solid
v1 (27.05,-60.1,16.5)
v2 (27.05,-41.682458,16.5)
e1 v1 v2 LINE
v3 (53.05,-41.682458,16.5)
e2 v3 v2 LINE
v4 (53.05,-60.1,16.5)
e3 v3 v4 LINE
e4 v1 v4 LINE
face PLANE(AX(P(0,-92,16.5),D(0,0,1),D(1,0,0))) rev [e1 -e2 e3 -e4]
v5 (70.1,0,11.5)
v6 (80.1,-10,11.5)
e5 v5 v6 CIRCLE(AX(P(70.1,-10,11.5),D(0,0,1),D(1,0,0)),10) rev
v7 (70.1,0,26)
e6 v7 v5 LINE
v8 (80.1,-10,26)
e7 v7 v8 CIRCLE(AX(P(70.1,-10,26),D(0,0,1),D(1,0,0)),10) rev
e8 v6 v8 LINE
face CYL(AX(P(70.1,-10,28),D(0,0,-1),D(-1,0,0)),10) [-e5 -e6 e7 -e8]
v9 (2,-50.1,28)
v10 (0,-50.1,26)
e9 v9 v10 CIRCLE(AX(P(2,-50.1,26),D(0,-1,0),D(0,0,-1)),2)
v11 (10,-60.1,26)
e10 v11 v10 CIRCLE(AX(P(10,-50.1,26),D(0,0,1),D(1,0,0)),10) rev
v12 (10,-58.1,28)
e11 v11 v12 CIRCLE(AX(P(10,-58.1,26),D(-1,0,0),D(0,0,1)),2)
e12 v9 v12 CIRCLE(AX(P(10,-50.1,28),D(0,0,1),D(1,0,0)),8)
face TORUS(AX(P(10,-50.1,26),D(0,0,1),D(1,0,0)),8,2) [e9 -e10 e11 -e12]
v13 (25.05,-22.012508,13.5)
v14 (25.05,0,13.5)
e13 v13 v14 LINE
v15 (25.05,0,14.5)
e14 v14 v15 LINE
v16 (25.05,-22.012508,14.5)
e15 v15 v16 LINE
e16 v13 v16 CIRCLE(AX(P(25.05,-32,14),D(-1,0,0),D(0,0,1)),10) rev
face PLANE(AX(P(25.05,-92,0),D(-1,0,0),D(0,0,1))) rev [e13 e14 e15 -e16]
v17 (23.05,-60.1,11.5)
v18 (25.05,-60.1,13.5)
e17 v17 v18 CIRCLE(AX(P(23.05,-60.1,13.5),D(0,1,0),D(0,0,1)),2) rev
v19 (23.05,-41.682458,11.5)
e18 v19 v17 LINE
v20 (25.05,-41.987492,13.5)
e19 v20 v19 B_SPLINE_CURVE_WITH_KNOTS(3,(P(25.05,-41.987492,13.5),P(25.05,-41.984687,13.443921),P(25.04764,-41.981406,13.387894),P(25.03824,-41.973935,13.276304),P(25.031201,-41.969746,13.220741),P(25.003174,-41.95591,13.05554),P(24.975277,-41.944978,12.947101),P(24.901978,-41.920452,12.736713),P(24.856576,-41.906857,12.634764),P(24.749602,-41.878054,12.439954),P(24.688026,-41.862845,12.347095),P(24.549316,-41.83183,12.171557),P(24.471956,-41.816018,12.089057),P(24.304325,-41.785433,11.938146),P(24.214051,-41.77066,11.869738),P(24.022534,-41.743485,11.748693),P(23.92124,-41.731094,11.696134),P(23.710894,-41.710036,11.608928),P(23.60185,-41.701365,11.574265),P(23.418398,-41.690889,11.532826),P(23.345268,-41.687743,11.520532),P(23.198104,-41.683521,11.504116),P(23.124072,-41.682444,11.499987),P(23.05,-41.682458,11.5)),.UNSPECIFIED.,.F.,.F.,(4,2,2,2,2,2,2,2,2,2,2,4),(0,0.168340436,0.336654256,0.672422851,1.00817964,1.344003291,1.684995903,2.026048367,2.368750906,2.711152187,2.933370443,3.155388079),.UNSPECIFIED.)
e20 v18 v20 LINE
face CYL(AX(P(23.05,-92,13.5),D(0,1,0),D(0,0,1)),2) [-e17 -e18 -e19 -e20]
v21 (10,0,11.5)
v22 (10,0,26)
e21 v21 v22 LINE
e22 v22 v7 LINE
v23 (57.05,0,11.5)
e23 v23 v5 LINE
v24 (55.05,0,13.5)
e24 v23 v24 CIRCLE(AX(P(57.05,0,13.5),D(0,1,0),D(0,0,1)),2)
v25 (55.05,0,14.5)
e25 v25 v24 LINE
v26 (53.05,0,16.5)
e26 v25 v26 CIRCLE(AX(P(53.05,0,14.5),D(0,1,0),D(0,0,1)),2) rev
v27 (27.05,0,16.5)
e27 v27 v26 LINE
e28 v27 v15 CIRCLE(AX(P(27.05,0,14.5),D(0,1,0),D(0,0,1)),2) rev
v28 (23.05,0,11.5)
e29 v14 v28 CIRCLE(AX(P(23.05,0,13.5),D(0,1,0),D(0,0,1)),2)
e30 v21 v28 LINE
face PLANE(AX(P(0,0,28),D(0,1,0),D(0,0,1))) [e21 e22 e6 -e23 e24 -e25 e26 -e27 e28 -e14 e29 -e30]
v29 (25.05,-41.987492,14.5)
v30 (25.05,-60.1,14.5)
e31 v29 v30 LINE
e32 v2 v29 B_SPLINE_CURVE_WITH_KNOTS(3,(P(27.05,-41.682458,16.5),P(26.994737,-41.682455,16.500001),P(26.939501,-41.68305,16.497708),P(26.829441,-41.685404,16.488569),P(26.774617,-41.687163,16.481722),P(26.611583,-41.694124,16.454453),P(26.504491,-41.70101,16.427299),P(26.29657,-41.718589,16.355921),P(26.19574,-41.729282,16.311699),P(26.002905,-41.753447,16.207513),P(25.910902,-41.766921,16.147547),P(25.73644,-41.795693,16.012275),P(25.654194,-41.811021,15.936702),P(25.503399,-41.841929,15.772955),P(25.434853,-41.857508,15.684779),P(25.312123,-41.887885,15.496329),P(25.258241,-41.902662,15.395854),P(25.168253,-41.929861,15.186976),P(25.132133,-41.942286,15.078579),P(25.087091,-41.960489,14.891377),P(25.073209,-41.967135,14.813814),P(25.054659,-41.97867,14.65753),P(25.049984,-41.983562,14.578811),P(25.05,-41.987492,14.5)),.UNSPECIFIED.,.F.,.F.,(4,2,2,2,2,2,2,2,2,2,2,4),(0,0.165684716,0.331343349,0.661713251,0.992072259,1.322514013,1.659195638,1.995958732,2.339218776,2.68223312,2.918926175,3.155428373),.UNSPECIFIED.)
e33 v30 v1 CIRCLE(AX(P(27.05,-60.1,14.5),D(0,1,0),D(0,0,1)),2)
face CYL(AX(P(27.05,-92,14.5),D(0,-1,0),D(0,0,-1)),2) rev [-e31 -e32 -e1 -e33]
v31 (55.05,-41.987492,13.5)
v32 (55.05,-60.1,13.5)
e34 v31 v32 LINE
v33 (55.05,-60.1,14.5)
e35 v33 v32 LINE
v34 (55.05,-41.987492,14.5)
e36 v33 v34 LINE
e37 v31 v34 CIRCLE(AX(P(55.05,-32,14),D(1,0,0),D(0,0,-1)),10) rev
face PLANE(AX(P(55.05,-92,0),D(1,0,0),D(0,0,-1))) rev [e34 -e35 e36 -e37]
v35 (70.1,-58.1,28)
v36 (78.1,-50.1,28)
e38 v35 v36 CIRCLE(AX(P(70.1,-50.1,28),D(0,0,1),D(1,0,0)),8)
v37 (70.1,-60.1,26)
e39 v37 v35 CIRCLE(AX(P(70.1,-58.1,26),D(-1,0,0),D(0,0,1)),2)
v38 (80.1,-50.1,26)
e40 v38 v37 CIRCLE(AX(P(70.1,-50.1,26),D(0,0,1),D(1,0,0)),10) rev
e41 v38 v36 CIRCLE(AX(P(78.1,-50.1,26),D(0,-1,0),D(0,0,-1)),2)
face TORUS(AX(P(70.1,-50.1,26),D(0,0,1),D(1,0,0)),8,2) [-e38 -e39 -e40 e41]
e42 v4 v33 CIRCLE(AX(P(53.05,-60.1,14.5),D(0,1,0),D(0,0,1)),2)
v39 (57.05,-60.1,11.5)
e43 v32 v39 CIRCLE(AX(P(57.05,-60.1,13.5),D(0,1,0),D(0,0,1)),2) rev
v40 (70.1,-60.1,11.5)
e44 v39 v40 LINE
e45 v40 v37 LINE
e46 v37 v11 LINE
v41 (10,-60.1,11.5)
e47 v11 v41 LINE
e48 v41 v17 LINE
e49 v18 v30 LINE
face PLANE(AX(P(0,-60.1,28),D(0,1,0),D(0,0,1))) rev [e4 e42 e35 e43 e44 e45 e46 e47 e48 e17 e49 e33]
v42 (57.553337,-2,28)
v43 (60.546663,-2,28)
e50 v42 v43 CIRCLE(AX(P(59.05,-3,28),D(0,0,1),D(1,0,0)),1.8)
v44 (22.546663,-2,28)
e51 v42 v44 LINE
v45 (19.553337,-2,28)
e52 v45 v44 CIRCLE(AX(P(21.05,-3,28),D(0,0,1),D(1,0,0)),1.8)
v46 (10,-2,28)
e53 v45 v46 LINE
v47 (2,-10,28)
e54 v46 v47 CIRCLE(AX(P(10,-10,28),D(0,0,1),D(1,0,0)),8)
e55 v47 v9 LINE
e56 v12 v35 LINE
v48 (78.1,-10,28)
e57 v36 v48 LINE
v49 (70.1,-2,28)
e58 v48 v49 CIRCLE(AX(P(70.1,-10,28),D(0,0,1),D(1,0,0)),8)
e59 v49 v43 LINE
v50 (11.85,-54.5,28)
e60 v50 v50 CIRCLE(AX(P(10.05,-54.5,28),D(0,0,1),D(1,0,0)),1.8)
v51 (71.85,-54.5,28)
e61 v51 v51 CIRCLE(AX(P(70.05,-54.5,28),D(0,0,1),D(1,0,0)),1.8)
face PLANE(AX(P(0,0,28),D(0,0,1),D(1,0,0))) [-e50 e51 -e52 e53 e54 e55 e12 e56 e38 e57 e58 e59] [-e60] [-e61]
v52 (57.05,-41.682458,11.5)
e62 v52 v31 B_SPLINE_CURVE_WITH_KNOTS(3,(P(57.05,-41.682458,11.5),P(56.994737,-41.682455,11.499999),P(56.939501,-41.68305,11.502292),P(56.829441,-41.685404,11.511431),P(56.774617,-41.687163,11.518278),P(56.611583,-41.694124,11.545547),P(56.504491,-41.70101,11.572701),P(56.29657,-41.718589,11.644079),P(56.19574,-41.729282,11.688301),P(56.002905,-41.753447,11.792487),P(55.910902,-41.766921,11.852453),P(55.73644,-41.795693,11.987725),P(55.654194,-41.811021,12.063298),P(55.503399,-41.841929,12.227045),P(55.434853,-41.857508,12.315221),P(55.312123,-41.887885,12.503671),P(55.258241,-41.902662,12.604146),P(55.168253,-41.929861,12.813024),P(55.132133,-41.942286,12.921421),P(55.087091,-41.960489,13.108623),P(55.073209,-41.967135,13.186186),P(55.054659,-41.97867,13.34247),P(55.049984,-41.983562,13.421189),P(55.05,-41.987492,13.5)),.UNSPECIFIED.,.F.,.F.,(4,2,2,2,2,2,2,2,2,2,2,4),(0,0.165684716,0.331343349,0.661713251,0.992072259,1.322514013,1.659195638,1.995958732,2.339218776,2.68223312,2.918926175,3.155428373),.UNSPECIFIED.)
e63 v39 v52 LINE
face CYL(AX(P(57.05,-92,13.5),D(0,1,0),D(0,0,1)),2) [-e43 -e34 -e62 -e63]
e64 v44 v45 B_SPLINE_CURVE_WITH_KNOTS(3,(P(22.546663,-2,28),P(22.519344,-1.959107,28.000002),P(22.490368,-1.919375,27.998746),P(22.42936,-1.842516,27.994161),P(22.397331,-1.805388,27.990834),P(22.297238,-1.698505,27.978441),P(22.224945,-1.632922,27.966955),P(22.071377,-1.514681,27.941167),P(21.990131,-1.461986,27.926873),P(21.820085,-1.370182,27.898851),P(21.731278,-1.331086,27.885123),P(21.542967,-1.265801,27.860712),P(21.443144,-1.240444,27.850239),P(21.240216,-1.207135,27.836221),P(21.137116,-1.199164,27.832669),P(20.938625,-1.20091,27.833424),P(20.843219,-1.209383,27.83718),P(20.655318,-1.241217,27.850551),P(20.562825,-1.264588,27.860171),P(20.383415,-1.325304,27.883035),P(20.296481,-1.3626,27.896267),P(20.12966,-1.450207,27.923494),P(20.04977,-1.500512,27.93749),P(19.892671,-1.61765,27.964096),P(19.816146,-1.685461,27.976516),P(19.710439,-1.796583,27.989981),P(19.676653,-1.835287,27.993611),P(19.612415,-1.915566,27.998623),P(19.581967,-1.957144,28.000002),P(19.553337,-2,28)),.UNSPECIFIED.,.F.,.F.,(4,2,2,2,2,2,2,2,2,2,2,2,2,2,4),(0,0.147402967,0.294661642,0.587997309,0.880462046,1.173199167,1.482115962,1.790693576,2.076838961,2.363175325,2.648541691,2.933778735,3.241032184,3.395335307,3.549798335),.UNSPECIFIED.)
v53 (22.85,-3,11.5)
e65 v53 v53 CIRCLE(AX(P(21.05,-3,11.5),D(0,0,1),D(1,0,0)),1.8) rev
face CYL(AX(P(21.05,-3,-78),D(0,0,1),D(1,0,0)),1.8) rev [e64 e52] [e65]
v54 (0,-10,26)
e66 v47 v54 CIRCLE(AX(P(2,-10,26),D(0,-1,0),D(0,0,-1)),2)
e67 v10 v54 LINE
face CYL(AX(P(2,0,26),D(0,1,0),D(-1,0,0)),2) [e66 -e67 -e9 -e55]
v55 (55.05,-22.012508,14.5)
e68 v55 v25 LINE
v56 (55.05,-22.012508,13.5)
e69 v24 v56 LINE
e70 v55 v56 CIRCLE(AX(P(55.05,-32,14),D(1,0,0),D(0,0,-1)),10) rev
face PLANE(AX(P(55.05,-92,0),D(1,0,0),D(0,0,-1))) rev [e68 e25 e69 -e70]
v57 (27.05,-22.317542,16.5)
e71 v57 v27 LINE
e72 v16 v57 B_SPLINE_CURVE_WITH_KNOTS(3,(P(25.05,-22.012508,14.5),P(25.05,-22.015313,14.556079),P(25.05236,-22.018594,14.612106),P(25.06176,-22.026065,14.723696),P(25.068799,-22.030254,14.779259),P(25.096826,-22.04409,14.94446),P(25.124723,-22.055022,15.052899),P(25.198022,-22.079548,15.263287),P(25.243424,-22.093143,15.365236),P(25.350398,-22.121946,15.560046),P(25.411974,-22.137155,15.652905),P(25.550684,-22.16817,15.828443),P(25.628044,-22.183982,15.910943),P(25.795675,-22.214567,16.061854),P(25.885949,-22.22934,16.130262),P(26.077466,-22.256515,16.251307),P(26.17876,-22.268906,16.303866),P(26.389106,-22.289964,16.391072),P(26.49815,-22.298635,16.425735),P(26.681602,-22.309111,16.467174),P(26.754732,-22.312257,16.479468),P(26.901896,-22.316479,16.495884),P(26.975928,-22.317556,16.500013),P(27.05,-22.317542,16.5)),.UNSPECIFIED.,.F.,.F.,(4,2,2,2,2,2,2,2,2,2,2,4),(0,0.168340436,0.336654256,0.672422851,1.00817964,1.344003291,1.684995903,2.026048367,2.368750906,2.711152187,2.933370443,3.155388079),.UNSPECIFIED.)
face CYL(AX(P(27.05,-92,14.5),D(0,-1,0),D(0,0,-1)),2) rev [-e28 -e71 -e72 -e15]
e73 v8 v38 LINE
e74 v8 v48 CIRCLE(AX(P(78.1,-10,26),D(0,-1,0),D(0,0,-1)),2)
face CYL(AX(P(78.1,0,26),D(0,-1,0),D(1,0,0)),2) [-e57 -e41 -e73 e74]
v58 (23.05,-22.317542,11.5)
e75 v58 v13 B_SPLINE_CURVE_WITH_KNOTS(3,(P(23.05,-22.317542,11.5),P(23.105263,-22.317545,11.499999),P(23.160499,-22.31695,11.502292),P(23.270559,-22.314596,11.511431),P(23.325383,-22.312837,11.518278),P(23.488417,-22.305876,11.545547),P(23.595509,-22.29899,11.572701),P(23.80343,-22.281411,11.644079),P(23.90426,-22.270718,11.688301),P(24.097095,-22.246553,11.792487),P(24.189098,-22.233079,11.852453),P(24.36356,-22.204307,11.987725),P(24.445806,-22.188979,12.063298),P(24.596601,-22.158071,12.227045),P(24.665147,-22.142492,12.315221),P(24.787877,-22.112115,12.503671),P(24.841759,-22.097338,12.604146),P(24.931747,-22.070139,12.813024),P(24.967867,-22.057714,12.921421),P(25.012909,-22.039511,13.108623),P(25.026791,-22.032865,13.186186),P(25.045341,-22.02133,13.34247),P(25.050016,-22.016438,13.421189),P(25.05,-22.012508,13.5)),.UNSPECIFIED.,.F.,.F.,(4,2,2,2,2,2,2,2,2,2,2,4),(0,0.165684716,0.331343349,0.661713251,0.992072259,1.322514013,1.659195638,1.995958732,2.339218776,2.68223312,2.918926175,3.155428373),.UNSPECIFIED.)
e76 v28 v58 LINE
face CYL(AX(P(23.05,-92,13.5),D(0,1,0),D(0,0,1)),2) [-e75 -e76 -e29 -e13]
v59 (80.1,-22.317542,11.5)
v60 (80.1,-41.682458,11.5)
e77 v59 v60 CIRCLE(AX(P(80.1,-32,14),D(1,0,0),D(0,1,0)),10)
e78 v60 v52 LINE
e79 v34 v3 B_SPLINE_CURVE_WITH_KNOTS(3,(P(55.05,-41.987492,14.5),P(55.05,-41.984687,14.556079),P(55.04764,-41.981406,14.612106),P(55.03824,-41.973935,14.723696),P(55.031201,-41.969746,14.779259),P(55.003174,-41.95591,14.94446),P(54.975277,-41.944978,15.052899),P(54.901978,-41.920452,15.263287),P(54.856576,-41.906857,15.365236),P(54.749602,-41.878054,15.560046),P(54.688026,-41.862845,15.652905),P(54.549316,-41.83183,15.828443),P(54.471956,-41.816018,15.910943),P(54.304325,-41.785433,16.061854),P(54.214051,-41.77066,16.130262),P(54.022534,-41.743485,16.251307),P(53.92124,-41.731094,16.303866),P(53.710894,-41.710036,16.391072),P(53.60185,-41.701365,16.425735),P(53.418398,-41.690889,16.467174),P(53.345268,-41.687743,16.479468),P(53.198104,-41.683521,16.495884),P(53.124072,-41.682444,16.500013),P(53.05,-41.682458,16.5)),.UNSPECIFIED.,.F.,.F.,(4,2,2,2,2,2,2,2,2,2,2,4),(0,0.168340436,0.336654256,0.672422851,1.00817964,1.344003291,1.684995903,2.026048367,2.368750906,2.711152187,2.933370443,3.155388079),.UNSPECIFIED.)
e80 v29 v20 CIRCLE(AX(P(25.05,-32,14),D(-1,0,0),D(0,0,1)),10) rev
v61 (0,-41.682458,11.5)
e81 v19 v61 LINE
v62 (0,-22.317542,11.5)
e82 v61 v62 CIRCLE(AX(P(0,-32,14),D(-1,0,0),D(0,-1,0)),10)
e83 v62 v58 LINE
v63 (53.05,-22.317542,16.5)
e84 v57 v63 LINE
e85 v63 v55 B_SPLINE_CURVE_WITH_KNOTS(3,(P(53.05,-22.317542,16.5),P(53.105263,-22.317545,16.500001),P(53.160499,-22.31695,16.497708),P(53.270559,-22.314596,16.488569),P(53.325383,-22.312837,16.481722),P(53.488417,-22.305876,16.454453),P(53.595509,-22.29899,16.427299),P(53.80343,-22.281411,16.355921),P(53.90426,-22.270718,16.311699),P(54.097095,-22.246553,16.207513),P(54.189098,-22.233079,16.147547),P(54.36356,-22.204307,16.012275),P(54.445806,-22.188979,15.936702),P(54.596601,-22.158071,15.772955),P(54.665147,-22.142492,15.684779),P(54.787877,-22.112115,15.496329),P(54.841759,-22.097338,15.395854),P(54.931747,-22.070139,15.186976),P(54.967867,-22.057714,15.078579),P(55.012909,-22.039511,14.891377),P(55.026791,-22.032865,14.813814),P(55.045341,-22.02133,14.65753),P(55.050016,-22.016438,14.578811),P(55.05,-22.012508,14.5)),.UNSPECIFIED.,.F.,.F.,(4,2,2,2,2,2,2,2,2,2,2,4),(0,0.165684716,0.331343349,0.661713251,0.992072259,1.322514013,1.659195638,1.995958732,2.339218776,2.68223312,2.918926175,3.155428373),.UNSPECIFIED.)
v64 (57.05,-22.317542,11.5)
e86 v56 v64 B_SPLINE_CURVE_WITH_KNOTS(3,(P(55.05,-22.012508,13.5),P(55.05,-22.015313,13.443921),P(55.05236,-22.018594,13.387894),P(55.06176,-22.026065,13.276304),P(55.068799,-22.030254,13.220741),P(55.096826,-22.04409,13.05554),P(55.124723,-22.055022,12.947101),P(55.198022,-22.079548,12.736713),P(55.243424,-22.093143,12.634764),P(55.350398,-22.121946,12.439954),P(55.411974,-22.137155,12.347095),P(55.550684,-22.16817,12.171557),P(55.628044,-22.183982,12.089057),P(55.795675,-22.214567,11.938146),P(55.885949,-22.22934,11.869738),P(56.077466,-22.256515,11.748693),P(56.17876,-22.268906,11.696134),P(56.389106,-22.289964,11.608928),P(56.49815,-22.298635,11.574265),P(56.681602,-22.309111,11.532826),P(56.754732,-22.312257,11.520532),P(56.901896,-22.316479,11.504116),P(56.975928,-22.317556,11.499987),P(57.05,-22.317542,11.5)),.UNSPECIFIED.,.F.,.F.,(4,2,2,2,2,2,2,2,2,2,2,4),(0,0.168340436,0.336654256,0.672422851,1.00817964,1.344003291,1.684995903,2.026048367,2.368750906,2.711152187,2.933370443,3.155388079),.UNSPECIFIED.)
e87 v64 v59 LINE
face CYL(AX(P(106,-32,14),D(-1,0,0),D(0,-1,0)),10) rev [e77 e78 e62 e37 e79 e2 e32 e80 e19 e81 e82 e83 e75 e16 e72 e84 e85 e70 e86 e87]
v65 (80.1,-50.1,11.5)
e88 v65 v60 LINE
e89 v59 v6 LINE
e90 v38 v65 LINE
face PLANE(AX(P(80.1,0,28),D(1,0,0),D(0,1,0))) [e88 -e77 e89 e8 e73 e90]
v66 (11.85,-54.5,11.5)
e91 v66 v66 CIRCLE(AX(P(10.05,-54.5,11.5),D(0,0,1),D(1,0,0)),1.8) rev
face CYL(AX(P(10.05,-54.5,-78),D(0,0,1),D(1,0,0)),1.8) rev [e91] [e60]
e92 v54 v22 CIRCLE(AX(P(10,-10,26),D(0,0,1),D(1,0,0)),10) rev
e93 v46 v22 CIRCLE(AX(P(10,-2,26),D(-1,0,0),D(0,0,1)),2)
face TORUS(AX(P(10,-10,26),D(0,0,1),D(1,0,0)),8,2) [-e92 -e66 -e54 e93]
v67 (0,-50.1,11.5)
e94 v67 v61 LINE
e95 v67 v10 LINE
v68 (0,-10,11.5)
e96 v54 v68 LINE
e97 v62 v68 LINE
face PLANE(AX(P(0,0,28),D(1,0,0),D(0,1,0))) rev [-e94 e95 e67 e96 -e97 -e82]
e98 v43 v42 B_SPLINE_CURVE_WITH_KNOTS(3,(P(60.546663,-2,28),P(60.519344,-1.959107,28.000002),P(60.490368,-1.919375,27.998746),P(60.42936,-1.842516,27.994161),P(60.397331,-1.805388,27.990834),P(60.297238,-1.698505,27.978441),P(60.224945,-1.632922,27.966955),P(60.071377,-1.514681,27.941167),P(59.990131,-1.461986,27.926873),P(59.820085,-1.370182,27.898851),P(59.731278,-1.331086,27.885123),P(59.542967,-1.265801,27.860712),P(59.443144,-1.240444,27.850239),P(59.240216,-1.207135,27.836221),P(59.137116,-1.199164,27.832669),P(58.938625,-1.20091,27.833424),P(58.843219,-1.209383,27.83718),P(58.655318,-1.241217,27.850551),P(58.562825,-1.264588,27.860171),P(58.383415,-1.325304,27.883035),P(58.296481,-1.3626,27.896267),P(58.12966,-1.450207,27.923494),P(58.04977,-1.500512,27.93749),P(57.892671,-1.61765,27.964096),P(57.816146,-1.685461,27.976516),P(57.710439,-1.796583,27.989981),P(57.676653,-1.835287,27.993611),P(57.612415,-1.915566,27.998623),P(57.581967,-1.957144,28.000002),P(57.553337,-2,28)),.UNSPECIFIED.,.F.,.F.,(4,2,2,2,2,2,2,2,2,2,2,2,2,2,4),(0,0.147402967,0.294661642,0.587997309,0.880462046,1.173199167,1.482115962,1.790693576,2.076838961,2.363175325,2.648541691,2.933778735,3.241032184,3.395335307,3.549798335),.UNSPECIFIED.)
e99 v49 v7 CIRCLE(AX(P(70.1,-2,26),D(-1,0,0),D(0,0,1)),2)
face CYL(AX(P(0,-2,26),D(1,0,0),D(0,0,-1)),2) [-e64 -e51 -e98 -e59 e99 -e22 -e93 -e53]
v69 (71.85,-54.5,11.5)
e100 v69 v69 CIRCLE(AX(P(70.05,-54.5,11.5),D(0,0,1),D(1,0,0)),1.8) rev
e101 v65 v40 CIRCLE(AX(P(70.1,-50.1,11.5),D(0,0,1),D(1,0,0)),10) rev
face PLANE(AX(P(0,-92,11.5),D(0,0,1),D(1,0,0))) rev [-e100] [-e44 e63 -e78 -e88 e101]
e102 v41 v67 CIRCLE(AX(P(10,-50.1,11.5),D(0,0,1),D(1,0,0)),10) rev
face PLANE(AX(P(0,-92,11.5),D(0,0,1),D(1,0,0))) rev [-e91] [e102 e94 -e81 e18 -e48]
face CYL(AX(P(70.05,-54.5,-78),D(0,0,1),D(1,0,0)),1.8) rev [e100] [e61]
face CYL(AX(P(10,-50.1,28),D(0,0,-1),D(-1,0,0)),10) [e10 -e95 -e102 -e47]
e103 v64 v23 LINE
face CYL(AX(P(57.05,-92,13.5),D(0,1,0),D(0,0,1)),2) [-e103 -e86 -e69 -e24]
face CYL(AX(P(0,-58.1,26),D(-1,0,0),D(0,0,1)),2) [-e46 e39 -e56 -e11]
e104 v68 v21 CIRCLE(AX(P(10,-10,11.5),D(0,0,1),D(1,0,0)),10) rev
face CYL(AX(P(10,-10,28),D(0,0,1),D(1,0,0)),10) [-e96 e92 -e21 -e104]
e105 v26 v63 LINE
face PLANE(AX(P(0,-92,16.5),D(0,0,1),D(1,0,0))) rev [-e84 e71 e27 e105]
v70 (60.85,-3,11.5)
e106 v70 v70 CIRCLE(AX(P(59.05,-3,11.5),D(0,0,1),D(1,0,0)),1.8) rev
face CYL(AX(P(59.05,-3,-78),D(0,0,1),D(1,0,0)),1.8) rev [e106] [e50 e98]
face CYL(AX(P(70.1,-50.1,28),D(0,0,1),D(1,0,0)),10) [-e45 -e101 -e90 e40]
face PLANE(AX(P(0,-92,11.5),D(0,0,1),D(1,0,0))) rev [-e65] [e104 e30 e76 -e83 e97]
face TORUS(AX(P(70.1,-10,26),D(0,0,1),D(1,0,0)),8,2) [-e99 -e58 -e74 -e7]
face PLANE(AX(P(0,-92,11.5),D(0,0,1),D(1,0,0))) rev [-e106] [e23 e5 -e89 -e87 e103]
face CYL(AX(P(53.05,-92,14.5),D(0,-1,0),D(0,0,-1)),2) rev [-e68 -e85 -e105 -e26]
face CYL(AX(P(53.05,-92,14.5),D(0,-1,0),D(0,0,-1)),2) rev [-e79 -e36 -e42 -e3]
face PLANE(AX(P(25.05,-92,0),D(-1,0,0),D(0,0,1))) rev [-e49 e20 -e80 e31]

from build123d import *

# Parameters (mm, degrees)
SKETCH_2_W          = 80.1
SKETCH_2_H          = 60.1
EXTRUDE_1_DEPTH     = 28
CUT_EXTRUDE_1_DEPTH = 106
SKETCH_6_R          = 1.8
CUT_EXTRUDE_2_DEPTH = 106
CUT_EXTRUDE_3_DEPTH = 92
FILLET_2_R          = 2
FILLET_3_R          = 10
FILLET_4_R          = 2


with BuildPart() as part:
    # 草图2 → 凸台-拉伸1 (new body)
    with BuildSketch(Plane.XY):
        with Locations((40.05, -30.05)):
            Rectangle(SKETCH_2_W, SKETCH_2_H)
    extrude(amount=EXTRUDE_1_DEPTH)

    # 草图3 → 切除-拉伸1 (cut)
    with BuildSketch(Plane.ZY):
        with BuildLine():
            ThreePointArc((14, -22), (6.928932188, -24.928932188), (4, -32))
            Line((4, -32), (14, -32))
            Line((14, -32), (14, -22))
        make_face()
        with BuildLine():
            Line((14, -32), (4, -32))
            ThreePointArc((4, -32), (6.928932188, -39.071067812), (14, -42))
            Line((14, -42), (14, -32))
        make_face()
        with BuildLine():
            Line((14, -22), (14, -32))
            Line((14, -32), (24, -32))
            ThreePointArc((24, -32), (21.071067812, -24.928932188), (14, -22))
        make_face()
        with BuildLine():
            Line((24, -32), (14, -32))
            Line((14, -32), (14, -42))
            ThreePointArc((14, -42), (21.071067812, -39.071067812), (24, -32))
        make_face()
    extrude(amount=-CUT_EXTRUDE_1_DEPTH, mode=Mode.SUBTRACT)

    # 草图6 → 切除-拉伸2 (cut)
    with BuildSketch(Plane.XY.offset(28)):
        with Locations((21.05, -3)):
            Circle(SKETCH_6_R)
        with Locations((59.05, -3)):
            Circle(SKETCH_6_R)
        with Locations((10.05, -54.5)):
            Circle(SKETCH_6_R)
        with Locations((70.05, -54.5)):
            Circle(SKETCH_6_R)
    extrude(amount=-CUT_EXTRUDE_2_DEPTH, mode=Mode.SUBTRACT)

    # 草图9 → 切除-拉伸3 (cut)
    with BuildSketch(Plane(origin=(0, 0, 0), x_dir=(1, 0, 0), z_dir=(0, 1, 0))):
        Polygon((0, 0), (0, -11.5), (25.05, -11.5), (25.05, -16.5), (55.05, -16.5), (55.05, -11.5), (80.1, -11.5), (80.1, 0), align=None)
    extrude(amount=-CUT_EXTRUDE_3_DEPTH, mode=Mode.SUBTRACT)

    # 圆角2
    fillet_2_edges = [part.edges().sort_by_distance(p)[0] for p in [
        (55.05, -50.891229183, 11.5),
        (55.05, -11.158770817, 11.5),
        (55.05, -50.891229183, 16.5),
        (55.05, -11.158770817, 16.5),
        (25.05, -50.891229183, 16.5),
        (25.05, -11.158770817, 16.5),
        (25.05, -50.891229183, 11.5),
        (25.05, -11.158770817, 11.5),
    ]]
    fillet(fillet_2_edges, radius=FILLET_2_R)

    # 圆角3
    fillet_3_edges = [part.edges().sort_by_distance(p)[0] for p in [
        (80.1, -60.1, 19.75),
        (0, -60.1, 19.75),
        (0, 0, 19.75),
        (80.1, 0, 19.75),
    ]]
    fillet(fillet_3_edges, radius=FILLET_3_R)

    # 圆角4
    # the kernel refuses this fillet: 2 mm, written as the material it takes off along each edge
    with BuildSketch(Plane(origin=(0, -50.1, 28), x_dir=(0, 0, -1), z_dir=(0, 1, 0))) as fillet_4_piece_1:
        with BuildLine():
            CenterArc((FILLET_4_R, -FILLET_4_R), FILLET_4_R, 90, 90)
            Line((0, -FILLET_4_R), (0, 0))
            Line((0, 0), (FILLET_4_R, 0))
        make_face()
    extrude(amount=40.1, mode=Mode.SUBTRACT)
    with BuildSketch(Plane(origin=(10, 0, 28), x_dir=(0, -1, 0), z_dir=(1, 0, 0))) as fillet_4_piece_2:
        with BuildLine():
            CenterArc((FILLET_4_R, FILLET_4_R), FILLET_4_R, 180, 90)
            Line((0, FILLET_4_R), (0, 0))
            Line((0, 0), (FILLET_4_R, 0))
        make_face()
    extrude(amount=60.1, mode=Mode.SUBTRACT)
    with BuildSketch(Plane(origin=(80.1, -10, 28), x_dir=(-1, 0, 0), z_dir=(0, -1, 0))) as fillet_4_piece_3:
        with BuildLine():
            CenterArc((FILLET_4_R, FILLET_4_R), FILLET_4_R, 180, 90)
            Line((0, FILLET_4_R), (0, 0))
            Line((0, 0), (FILLET_4_R, 0))
        make_face()
    extrude(amount=40.1, mode=Mode.SUBTRACT)
    with BuildSketch(Plane(origin=(70.1, -60.1, 28), x_dir=(0, 0, -1), z_dir=(-1, 0, 0))) as fillet_4_piece_4:
        with BuildLine():
            CenterArc((FILLET_4_R, -FILLET_4_R), FILLET_4_R, 90, 90)
            Line((0, -FILLET_4_R), (0, 0))
            Line((0, 0), (FILLET_4_R, 0))
        make_face()
    extrude(amount=60.1, mode=Mode.SUBTRACT)
    with BuildSketch(Plane(origin=(70.1, -10, 28), x_dir=(1, 0, 0), z_dir=(0, -1, 0))) as fillet_4_piece_5:
        with BuildLine():
            CenterArc((10 - FILLET_4_R, -FILLET_4_R), FILLET_4_R, 0, 90)
            Line((10, -FILLET_4_R), (10, 0))
            Line((10, 0), (10 - FILLET_4_R, 0))
        make_face()
    revolve(axis=Axis((70.1, -10, 28), (0, 0, 1)), revolution_arc=90, mode=Mode.SUBTRACT)
    with BuildSketch(Plane(origin=(70.1, -50.1, 28), x_dir=(1, 0, 0), z_dir=(0, 1, 0))) as fillet_4_piece_6:
        with BuildLine():
            CenterArc((10 - FILLET_4_R, FILLET_4_R), FILLET_4_R, 270, 90)
            Line((10, FILLET_4_R), (10, 0))
            Line((10, 0), (10 - FILLET_4_R, 0))
        make_face()
    revolve(axis=Axis((70.1, -50.1, 28), (0, 0, -1)), revolution_arc=90, mode=Mode.SUBTRACT)
    with BuildSketch(Plane(origin=(10, -50.1, 28), x_dir=(-1, 0, 0), z_dir=(0, 1, 0))) as fillet_4_piece_7:
        with BuildLine():
            CenterArc((10 - FILLET_4_R, -FILLET_4_R), FILLET_4_R, 0, 90)
            Line((10 - FILLET_4_R, 0), (10, 0))
            Line((10, 0), (10, -FILLET_4_R))
        make_face()
    revolve(axis=Axis((10, -50.1, 28), (0, 0, 1)), revolution_arc=90, mode=Mode.SUBTRACT)
    with BuildSketch(Plane(origin=(10, -10, 28), x_dir=(-1, 0, 0), z_dir=(0, -1, 0))) as fillet_4_piece_8:
        with BuildLine():
            CenterArc((10 - FILLET_4_R, FILLET_4_R), FILLET_4_R, 270, 90)
            Line((10, FILLET_4_R), (10, 0))
            Line((10, 0), (10 - FILLET_4_R, 0))
        make_face()
    revolve(axis=Axis((10, -10, 28), (0, 0, -1)), revolution_arc=90, mode=Mode.SUBTRACT)


solid = part.part
